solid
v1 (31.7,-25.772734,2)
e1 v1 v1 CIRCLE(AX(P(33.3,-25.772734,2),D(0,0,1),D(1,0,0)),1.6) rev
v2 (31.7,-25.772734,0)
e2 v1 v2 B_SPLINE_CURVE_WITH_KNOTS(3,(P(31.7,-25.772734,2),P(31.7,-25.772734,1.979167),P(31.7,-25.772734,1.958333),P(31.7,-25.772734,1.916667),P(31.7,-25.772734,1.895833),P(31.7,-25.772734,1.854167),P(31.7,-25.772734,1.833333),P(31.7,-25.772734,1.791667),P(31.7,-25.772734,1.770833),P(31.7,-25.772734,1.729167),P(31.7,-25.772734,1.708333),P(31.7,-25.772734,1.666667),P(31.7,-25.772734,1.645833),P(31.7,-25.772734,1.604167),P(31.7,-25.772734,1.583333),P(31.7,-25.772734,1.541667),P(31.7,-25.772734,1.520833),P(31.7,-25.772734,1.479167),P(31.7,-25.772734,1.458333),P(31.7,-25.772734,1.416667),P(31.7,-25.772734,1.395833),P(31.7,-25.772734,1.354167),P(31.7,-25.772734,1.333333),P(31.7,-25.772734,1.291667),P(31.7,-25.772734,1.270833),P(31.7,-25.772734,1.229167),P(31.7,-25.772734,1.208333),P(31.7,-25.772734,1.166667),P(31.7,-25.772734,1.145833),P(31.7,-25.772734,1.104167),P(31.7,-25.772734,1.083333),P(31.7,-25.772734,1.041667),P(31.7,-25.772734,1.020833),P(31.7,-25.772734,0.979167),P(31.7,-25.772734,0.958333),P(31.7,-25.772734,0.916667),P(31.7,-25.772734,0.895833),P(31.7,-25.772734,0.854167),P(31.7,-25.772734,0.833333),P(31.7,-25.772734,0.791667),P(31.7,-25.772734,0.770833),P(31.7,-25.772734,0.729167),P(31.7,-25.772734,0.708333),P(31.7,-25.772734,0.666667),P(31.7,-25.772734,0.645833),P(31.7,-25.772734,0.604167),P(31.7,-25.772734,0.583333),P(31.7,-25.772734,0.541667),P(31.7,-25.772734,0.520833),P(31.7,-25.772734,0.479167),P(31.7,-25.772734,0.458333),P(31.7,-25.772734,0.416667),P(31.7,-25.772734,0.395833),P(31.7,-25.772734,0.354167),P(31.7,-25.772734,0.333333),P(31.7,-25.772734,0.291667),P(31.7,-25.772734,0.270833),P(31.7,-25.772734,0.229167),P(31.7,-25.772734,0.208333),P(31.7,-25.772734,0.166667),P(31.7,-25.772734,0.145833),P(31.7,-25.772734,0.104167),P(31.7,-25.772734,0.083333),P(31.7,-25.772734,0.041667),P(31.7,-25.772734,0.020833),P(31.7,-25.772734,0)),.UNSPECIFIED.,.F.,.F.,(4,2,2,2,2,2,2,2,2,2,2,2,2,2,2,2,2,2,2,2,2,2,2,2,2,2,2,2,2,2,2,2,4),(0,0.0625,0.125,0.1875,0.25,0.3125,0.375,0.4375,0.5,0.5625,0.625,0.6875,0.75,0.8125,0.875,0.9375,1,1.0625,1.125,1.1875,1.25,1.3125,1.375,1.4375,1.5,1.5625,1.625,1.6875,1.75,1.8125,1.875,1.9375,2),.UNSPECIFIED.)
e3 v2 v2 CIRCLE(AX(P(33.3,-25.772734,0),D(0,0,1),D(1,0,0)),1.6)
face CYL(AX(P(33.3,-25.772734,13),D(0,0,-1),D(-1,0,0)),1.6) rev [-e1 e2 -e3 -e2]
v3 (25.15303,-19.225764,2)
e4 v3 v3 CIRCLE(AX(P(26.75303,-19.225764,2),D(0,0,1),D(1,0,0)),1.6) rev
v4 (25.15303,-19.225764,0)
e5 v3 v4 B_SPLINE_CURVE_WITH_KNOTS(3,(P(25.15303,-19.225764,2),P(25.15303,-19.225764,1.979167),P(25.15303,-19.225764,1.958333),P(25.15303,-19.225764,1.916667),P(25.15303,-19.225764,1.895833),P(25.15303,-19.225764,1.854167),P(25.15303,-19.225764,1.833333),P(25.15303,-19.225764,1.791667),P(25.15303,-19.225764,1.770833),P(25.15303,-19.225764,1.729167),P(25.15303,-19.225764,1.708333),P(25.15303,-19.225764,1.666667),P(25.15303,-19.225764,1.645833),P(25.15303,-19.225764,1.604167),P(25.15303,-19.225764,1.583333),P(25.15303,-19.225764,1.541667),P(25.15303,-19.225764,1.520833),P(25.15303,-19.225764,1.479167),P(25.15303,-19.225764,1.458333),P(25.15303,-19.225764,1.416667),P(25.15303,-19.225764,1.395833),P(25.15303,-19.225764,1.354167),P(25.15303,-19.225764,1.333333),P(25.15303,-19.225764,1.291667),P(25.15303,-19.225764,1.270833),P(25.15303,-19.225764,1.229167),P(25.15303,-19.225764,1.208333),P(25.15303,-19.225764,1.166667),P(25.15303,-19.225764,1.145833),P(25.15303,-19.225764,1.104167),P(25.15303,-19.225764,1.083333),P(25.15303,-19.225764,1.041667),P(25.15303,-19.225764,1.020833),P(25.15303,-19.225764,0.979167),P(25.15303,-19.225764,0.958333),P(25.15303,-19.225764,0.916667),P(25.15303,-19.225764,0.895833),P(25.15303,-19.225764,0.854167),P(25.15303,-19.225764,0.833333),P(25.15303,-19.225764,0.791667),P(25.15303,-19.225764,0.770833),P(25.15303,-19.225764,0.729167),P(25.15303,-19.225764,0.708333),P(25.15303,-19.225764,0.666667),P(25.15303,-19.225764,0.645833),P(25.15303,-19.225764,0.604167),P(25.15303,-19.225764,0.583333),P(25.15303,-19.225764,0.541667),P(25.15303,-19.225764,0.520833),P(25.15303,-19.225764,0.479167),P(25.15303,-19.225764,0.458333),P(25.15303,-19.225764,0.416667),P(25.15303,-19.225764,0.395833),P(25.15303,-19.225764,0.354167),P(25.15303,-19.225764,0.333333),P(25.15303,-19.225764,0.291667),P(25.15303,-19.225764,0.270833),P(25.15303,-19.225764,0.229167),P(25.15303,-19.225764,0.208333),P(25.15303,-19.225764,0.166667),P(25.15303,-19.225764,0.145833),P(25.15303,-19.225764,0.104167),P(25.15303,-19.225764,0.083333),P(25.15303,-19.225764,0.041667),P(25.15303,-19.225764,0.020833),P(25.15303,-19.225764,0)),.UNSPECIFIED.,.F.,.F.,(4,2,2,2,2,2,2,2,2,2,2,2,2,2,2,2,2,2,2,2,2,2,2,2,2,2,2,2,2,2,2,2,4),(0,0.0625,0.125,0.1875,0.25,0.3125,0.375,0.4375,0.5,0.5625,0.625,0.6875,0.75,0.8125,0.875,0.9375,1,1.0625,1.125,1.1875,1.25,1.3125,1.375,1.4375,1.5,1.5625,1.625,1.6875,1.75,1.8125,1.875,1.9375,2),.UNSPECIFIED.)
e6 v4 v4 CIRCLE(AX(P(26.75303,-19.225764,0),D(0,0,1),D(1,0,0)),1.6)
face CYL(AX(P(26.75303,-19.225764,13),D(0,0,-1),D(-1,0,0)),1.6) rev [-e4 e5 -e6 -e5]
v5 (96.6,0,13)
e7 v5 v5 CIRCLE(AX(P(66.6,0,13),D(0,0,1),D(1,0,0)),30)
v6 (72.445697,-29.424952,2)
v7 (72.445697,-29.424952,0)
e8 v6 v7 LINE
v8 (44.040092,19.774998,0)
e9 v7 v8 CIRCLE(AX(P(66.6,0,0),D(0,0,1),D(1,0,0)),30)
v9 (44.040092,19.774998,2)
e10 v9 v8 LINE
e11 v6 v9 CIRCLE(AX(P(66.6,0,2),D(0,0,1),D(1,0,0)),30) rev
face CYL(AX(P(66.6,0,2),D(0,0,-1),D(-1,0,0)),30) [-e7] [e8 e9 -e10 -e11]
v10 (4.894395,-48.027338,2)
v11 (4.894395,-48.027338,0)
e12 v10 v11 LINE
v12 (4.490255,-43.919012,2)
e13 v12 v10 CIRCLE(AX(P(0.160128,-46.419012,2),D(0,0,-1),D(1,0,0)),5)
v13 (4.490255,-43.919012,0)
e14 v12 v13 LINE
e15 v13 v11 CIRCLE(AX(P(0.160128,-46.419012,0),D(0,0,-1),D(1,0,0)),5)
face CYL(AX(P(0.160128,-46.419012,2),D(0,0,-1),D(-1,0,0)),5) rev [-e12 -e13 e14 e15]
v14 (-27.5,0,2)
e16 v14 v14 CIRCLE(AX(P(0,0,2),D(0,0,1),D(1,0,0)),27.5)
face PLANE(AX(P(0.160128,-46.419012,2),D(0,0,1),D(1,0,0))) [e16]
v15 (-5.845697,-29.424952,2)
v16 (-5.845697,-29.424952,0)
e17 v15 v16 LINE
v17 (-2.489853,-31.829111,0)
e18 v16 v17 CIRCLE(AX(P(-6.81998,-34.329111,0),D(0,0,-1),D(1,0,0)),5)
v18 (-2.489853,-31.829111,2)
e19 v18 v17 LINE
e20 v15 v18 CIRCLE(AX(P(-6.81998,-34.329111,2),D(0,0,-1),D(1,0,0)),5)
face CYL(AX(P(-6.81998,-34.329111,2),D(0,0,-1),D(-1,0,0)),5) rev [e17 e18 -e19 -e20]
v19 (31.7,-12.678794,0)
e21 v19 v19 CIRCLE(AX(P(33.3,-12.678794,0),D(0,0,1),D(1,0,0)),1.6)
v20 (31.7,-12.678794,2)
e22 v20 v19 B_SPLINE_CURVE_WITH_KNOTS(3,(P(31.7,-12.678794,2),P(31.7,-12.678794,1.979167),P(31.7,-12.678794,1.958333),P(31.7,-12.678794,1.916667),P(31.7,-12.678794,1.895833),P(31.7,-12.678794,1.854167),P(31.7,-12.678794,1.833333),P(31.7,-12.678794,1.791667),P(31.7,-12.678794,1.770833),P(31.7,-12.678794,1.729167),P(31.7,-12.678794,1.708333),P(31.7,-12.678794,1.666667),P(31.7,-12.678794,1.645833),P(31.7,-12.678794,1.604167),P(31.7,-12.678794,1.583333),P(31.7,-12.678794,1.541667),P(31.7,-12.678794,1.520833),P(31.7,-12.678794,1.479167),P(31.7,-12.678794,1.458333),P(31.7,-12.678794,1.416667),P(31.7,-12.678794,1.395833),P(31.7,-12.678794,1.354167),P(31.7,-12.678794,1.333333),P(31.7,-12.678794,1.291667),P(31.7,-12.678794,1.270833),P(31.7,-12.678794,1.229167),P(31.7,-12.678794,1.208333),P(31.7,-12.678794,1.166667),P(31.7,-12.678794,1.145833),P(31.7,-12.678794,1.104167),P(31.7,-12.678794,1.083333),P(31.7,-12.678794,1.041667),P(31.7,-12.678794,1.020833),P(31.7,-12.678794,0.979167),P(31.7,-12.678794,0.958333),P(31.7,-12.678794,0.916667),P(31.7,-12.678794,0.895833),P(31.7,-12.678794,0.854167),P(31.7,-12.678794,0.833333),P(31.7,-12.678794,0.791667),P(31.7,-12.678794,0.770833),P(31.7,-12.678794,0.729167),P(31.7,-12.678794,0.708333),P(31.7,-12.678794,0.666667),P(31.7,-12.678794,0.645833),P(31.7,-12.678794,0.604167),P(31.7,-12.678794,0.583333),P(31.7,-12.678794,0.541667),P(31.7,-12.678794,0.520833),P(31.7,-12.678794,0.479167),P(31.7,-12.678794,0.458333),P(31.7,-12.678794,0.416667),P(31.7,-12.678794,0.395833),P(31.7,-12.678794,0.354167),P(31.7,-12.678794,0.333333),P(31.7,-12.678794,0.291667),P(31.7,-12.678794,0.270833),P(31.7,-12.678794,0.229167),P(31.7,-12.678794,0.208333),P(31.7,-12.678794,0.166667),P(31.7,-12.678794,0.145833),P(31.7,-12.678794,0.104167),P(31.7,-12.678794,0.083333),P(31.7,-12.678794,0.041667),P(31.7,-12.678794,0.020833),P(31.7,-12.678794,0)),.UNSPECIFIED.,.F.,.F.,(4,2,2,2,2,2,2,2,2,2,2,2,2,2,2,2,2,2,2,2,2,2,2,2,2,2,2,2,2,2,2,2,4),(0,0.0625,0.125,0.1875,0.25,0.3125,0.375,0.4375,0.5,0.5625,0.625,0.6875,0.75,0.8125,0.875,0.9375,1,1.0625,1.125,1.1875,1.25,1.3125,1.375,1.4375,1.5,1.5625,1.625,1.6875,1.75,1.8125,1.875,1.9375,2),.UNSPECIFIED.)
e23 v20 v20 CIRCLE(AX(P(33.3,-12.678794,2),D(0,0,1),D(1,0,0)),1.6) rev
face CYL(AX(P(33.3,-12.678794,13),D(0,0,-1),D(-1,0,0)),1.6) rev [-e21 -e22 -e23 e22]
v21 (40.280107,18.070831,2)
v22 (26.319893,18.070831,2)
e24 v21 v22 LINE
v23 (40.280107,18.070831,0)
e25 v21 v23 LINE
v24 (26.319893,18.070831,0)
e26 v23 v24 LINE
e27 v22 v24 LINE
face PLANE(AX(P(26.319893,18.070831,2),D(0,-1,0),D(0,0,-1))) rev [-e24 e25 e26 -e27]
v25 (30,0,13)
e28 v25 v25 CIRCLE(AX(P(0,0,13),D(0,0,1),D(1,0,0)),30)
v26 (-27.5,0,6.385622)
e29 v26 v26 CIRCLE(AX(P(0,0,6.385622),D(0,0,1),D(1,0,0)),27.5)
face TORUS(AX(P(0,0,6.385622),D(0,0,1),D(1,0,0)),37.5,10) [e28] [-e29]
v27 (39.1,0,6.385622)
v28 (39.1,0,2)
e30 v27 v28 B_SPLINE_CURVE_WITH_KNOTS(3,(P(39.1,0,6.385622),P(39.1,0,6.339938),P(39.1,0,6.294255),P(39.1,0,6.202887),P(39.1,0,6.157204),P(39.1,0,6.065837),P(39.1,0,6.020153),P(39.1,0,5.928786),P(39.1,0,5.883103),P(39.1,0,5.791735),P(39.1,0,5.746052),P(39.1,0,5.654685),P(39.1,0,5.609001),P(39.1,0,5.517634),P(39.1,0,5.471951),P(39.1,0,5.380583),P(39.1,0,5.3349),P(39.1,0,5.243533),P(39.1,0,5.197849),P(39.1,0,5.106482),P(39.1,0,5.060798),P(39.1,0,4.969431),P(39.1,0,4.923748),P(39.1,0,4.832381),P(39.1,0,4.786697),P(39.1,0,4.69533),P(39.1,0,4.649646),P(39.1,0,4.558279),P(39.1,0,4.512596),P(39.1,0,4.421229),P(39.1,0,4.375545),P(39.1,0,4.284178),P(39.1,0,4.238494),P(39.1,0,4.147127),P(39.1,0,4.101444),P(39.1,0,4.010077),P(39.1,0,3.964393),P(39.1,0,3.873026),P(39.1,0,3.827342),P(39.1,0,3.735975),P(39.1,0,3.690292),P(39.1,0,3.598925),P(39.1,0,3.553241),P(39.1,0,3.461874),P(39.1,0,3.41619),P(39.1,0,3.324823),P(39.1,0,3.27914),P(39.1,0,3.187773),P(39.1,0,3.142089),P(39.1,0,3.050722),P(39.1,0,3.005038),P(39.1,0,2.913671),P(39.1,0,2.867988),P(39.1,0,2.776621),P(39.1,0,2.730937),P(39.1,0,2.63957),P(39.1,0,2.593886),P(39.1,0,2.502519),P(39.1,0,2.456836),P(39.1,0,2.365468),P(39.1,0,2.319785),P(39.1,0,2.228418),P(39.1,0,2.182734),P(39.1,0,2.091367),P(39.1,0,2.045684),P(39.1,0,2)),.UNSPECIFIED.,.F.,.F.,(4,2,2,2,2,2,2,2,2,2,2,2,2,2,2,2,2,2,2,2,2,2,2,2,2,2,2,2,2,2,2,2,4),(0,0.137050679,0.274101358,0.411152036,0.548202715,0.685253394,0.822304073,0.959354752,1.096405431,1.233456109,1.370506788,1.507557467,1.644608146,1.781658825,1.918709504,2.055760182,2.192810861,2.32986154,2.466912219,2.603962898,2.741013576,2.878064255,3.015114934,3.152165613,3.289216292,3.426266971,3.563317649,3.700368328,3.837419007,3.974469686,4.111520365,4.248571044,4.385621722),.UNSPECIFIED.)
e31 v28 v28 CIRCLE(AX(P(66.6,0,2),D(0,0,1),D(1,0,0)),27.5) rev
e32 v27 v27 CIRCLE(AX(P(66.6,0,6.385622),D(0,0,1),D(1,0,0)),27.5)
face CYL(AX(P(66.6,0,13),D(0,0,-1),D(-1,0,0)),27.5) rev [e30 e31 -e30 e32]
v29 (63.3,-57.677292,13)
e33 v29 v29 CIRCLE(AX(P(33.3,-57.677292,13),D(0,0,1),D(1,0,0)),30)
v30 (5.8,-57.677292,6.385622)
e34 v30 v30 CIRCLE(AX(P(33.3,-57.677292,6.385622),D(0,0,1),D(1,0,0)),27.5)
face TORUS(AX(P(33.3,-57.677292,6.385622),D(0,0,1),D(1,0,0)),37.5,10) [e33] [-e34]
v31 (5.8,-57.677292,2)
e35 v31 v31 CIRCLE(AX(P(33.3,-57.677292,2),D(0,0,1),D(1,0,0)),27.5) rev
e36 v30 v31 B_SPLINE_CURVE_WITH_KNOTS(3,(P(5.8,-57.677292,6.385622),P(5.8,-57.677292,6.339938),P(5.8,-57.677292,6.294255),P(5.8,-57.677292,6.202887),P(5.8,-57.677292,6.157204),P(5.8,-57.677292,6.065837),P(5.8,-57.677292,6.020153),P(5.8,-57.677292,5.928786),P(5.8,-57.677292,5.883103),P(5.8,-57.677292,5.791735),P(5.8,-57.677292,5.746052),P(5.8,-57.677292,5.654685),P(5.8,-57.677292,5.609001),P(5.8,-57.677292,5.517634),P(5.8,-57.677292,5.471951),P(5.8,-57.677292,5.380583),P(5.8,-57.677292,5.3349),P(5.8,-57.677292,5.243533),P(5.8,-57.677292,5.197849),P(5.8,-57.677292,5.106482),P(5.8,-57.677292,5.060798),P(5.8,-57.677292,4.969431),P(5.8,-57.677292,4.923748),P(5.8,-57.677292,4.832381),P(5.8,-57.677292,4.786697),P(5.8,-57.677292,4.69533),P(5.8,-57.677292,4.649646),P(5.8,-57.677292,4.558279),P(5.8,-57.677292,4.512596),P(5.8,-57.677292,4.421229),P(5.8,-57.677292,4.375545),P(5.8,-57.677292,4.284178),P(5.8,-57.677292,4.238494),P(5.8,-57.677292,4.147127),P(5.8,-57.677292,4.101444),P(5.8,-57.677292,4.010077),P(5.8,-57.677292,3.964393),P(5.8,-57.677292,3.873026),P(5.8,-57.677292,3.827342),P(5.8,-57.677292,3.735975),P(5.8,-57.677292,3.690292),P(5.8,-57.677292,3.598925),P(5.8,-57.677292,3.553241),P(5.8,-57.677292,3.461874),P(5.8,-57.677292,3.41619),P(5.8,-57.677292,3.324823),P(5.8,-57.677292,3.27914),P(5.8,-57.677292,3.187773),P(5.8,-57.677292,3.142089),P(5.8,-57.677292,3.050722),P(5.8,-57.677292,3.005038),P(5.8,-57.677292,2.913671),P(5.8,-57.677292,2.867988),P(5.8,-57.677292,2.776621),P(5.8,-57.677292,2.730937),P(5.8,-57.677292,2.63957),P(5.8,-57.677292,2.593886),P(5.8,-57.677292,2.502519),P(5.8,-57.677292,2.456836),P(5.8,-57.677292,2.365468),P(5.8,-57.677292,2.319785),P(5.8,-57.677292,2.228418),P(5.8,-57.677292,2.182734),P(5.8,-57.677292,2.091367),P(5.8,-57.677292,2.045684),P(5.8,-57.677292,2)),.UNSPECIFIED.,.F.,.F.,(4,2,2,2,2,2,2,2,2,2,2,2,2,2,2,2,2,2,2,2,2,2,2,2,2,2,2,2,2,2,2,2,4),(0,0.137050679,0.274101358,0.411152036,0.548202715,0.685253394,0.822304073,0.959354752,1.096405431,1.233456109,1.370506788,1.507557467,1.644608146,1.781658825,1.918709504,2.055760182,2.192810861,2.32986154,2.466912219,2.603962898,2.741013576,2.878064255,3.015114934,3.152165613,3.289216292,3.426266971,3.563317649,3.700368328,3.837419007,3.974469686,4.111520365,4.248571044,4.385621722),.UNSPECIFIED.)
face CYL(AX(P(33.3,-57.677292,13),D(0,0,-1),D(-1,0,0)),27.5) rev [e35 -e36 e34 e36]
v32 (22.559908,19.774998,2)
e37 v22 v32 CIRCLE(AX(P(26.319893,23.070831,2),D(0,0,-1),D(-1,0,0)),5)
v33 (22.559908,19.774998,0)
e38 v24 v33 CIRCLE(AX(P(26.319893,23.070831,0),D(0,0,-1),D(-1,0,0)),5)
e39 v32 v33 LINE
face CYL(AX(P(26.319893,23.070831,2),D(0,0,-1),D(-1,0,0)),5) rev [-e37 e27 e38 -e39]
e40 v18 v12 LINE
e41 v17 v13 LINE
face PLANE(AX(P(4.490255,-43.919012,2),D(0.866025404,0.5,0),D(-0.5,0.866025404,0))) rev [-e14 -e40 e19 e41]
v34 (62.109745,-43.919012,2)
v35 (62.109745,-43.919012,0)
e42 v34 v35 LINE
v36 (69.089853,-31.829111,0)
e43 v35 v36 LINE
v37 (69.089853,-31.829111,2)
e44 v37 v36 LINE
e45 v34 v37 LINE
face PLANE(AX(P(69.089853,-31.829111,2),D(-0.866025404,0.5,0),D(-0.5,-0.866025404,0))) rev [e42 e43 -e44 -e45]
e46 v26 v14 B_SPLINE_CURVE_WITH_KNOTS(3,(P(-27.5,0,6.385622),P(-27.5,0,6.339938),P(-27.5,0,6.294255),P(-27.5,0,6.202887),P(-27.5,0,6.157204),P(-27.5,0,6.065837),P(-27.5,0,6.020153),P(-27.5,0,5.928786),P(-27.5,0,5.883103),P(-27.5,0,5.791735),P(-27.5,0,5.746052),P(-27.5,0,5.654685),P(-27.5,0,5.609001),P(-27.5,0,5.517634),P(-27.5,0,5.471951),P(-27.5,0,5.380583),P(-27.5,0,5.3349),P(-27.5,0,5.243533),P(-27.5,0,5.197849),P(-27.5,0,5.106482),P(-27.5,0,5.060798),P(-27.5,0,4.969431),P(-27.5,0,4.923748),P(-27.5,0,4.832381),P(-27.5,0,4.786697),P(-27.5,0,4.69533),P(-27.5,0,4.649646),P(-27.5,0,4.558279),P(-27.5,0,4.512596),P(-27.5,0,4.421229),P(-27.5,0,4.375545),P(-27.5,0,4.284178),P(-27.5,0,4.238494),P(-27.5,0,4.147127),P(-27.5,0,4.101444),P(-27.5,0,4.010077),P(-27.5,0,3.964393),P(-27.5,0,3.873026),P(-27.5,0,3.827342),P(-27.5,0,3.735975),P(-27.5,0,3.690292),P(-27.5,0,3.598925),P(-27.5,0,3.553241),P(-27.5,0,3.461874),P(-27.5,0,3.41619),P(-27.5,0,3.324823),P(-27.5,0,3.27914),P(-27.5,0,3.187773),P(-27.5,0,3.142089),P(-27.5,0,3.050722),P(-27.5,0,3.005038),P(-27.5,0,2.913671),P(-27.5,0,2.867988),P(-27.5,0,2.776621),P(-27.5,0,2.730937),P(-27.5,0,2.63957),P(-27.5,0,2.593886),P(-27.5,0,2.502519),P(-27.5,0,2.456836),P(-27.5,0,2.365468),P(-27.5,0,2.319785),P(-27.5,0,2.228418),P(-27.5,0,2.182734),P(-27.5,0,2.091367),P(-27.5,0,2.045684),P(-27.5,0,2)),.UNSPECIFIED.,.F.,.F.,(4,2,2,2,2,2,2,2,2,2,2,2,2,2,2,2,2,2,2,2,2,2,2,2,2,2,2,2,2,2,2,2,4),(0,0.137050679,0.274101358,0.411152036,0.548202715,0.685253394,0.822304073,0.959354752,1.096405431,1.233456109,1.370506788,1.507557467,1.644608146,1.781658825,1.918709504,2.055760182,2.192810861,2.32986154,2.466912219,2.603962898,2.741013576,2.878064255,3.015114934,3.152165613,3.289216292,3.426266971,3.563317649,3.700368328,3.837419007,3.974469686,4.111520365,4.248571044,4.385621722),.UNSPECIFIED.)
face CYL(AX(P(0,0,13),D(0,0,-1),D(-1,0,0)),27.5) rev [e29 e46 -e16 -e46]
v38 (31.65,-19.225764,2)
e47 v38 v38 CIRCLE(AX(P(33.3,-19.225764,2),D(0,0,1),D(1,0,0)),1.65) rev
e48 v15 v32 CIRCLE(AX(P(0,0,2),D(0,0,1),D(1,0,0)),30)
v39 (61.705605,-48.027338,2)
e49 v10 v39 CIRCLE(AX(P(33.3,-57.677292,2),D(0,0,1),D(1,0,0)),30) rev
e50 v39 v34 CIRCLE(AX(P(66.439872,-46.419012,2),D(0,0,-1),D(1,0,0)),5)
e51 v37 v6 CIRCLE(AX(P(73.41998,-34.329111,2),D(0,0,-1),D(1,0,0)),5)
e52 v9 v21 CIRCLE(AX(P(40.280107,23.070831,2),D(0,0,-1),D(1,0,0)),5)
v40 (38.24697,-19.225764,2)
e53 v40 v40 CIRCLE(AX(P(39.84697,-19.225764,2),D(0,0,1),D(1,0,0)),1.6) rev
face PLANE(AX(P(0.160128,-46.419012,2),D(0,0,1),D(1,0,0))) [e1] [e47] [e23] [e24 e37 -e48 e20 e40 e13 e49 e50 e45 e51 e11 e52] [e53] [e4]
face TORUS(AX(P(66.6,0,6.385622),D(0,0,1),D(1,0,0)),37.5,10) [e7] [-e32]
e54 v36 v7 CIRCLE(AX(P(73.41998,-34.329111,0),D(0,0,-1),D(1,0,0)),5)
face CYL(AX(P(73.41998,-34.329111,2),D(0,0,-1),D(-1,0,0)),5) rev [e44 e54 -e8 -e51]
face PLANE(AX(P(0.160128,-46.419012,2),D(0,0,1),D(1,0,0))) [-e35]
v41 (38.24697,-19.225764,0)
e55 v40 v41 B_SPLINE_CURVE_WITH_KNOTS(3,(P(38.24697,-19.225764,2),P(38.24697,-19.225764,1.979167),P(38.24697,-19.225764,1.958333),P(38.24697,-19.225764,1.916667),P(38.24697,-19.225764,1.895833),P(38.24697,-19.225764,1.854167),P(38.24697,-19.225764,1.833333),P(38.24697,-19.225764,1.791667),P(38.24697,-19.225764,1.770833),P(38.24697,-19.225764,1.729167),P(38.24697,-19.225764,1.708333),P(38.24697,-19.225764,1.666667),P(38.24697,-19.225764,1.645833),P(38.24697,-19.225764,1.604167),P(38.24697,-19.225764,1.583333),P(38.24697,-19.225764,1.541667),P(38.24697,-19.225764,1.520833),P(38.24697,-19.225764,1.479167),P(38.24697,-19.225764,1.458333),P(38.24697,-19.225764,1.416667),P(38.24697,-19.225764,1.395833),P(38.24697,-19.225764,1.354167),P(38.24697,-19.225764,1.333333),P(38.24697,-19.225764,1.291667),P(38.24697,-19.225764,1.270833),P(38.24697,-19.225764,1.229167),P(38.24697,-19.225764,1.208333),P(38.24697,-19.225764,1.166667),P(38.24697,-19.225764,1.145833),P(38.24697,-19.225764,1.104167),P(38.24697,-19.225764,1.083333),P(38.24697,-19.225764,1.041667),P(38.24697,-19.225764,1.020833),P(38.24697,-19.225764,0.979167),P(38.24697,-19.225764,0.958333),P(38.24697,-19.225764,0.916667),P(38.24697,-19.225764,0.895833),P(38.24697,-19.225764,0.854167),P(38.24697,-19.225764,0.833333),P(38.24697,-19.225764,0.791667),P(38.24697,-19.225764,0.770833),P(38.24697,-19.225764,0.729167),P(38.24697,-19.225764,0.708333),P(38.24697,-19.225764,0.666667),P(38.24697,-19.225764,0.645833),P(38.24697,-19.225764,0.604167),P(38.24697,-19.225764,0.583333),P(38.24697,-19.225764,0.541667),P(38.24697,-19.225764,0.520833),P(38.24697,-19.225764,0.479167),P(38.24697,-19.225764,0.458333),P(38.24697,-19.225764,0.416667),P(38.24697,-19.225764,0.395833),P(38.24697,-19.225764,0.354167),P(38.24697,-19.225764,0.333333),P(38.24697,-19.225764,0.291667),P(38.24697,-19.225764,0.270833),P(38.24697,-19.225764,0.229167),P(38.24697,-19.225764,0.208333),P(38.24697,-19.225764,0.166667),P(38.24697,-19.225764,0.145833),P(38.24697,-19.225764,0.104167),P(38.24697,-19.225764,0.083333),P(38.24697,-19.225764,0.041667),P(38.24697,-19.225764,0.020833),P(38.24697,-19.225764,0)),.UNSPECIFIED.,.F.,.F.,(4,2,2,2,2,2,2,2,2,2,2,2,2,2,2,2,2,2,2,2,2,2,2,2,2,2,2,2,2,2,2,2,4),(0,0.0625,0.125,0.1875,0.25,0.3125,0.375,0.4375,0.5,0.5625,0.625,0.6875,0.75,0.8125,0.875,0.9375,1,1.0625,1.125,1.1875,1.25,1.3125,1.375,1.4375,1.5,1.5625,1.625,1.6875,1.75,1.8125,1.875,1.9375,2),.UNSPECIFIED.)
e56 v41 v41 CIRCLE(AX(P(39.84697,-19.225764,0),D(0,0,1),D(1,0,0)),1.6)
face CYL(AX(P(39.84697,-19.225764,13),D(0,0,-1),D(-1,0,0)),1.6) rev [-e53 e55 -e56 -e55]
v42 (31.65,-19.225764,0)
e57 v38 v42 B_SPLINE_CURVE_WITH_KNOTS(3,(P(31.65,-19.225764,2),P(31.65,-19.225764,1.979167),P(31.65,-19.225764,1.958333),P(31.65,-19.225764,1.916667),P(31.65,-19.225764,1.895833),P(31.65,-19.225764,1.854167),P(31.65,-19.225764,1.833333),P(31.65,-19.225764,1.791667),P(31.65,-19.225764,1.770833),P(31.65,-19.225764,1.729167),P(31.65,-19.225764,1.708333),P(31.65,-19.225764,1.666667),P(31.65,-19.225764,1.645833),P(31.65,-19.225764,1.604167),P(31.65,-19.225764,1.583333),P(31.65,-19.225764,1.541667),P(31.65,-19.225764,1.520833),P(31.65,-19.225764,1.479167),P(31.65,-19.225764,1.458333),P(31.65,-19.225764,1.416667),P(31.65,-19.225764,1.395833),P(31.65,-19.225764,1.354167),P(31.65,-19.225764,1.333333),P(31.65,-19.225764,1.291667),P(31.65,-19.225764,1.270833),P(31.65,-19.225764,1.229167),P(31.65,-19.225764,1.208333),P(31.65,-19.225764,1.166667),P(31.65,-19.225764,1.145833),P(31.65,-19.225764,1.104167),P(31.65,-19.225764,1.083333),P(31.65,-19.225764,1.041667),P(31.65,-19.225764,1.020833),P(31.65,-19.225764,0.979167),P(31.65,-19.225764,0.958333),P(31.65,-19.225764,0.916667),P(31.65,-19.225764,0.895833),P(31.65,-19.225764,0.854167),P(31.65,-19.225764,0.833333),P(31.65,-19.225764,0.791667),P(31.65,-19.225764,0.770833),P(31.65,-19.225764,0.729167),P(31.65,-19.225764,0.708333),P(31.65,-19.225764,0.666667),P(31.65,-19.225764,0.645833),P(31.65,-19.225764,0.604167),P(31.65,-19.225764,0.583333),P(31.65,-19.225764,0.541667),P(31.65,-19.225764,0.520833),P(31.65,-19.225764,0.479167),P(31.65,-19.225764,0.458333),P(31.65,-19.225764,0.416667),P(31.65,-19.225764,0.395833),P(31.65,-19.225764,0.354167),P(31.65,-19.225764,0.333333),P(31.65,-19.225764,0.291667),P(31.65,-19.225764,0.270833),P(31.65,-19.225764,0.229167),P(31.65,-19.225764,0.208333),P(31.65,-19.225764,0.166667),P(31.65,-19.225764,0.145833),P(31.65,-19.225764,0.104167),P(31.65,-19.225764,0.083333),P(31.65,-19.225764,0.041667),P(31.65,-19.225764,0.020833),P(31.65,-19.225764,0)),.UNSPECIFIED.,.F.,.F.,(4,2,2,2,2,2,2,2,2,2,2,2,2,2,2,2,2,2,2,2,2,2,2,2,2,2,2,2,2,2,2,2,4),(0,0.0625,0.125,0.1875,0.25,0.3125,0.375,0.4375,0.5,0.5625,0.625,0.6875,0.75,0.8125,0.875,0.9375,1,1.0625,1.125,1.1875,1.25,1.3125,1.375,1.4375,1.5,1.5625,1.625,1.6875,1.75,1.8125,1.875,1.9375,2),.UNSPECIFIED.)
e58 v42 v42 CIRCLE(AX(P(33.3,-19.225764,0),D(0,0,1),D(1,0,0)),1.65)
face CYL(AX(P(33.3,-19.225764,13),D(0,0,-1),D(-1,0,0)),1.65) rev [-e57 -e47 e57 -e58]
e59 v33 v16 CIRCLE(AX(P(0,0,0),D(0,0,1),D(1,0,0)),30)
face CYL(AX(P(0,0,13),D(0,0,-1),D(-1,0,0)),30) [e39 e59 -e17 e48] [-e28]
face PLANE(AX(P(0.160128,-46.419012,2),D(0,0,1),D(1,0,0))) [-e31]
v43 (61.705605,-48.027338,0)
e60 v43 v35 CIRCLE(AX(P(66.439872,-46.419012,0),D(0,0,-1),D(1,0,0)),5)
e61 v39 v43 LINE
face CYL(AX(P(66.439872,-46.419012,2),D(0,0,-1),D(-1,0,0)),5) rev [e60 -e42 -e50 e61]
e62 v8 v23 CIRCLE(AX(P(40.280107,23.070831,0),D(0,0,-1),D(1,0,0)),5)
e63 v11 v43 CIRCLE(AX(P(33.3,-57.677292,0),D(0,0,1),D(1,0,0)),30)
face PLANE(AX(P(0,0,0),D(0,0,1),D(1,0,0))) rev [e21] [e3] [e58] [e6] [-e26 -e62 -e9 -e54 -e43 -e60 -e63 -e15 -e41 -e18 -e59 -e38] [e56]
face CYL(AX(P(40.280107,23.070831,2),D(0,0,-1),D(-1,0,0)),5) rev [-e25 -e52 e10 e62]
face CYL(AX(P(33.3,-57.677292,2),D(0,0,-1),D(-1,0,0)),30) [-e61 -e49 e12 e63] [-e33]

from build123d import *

# Parameters (mm, degrees)
SKETCH_1_R          = 30
SKETCH_1_R_2        = 27.5
EXTRUDE_1_DEPTH     = 13
SKETCH_1_R_3        = 29.999999999999996
EXTRUDE_1_2_DEPTH   = 13
EXTRUDE_1_3_DEPTH   = 13
EXTRUDE_2_DEPTH     = 2
SKETCH_3_R          = 1.6500000000000017
SKETCH_3_R_2        = 1.5999999999999979
SKETCH_3_R_3        = 1.5999999999999985
SKETCH_3_R_4        = 1.6000000000000019
CUT_EXTRUDE_5_DEPTH = 132.10250765535577
FILLET_1_R          = 10


with BuildPart() as part:
    # 草图1 → 凸台-拉伸1 (new body)
    with BuildSketch(Plane.XY):
        with Locations(Location((0, 0, 0), (0, 0, 180))):
            Circle(SKETCH_1_R)
        with Locations(Location((0, 0, 0), (0, 0, 180))):
            Circle(SKETCH_1_R_2, mode=Mode.SUBTRACT)
    extrude(amount=EXTRUDE_1_DEPTH)



with BuildPart() as body_2:
    # 草图1 → Extrude 1 2 (new body)
    with BuildSketch(Plane.XY):
        with Locations(Location((66.6, 0, 0), (0, 0, 180))):
            Circle(SKETCH_1_R_3)
        with Locations(Location((66.6, 0, 0), (0, 0, 180))):
            Circle(SKETCH_1_R_2, mode=Mode.SUBTRACT)
    extrude(amount=EXTRUDE_1_2_DEPTH)


with BuildPart() as body_3:
    # 草图1 → Extrude 1 3 (new body)
    with BuildSketch(Plane.XY):
        with Locations(Location((33.30000000000001, -57.6772918920436, 0), (0, 0, 180))):
            Circle(SKETCH_1_R_3)
        with Locations(Location((33.30000000000001, -57.6772918920436, 0), (0, 0, 180))):
            Circle(SKETCH_1_R_2, mode=Mode.SUBTRACT)
    extrude(amount=EXTRUDE_1_3_DEPTH)


with BuildPart() as part_1:
    add(part.part)

    add(body_2.part)  # 凸台-拉伸2 merges body 2

    add(body_3.part)  # 凸台-拉伸2 merges body 3
    # 草图2 → 凸台-拉伸2 (add)
    with BuildSketch(Plane.XY):
        with BuildLine():
            Line((26.3198925252566, 18.070831312697457), (40.280107474743396, 18.070831312697457))
            ThreePointArc((40.280107474743396, 18.070831312697457), (42.3441853289733, 18.516758123597654), (44.04009212120862, 19.77499826802639))
            ThreePointArc((44.04009212120862, 19.77499826802639), (92.58076211353317, 15), (72.44569692050842, -29.424952464083248))
            ThreePointArc((72.44569692050842, -29.424952464083248), (70.50807559525407, -30.264530756395246), (69.08985272167097, -31.829111208097117))
            Line((69.08985272167097, -31.829111208097117), (62.10974524692759, -43.91901199664395))
            ThreePointArc((62.10974524692759, -43.91901199664395), (61.46389026628078, -45.92951925924603), (61.70560479929982, -48.027337695986766))
            ThreePointArc((61.70560479929982, -48.027337695986766), (33.300000000000004, -87.6772918920436), (4.894395200700185, -48.02733769598677))
            ThreePointArc((4.894395200700185, -48.02733769598677), (5.13610973371921, -45.92951925924604), (4.4902547530724135, -43.91901199664397))
            Line((4.4902547530724135, -43.91901199664397), (-2.489852721670984, -31.829111208097103))
            ThreePointArc((-2.489852721670984, -31.829111208097103), (-3.9080755952540875, -30.264530756395228), (-5.845696920508439, -29.42495246408323))
            ThreePointArc((-5.845696920508439, -29.42495246408323), (-25.980762113533153, 15.000000000000009), (22.55990787879137, 19.77499826802639))
            ThreePointArc((22.55990787879137, 19.77499826802639), (24.25581467102669, 18.516758123597654), (26.3198925252566, 18.070831312697457))
        make_face()
    extrude(amount=EXTRUDE_2_DEPTH)

    # 草图3 → 切除-拉伸5 (cut, through all)
    with BuildSketch(Plane.XY):
        with Locations(Location((33.3, -19.225763964014533, 0), (0, 0, 180))):
            Circle(SKETCH_3_R)
        with Locations(Location((33.3, -12.678793774014526, 0), (0, 0, 180))):
            Circle(SKETCH_3_R_2)
        with Locations(Location((39.84697019, -19.225763964014533, 0), (0, 0, 180))):
            Circle(SKETCH_3_R_3)
        with Locations(Location((33.3, -25.772734154014536, 0), (0, 0, 180))):
            Circle(SKETCH_3_R_3)
        with Locations(Location((26.75302980999999, -19.225763964014533, 0), (0, 0, 180))):
            Circle(SKETCH_3_R_4)
    extrude(amount=CUT_EXTRUDE_5_DEPTH, mode=Mode.SUBTRACT)

    # 圆角1
    # the kernel refuses this fillet: 10 mm, written as the material it takes off along each edge
    with BuildSketch(Plane(origin=(0, 0, 13), x_dir=(-1, 1.2e-16, 0), z_dir=(1.2e-16, 1, 0))) as fillet_1_piece_1:
        with BuildLine():
            CenterArc((37.5, -6.614378277661482), FILLET_1_R, 138.59037789072914, 41.409622109270856)
            Line((27.5, -6.614378277661482), (27.3, -6.614378277661482))
            Line((27.3, -6.614378277661482), (27.3, 0))
            Line((27.3, 0), (27.5, 0.1999999999999993))
            ThreePointArc((27.5, 0.1999999999999993), (28.75, 0.1999999999999993), (29.85, 0.1322875655532254))
            Line((29.85, 0.1322875655532254), (30, -3.55e-15))
        make_face()
    revolve(axis=Axis((0, 0, 13), (0, 0, 1)), mode=Mode.SUBTRACT)
    with BuildSketch(Plane(origin=(66.6, 0, 13), x_dir=(-1, 1.2e-16, 0), z_dir=(1.2e-16, 1, 0))) as fillet_1_piece_2:
        with BuildLine():
            CenterArc((37.5, -6.614378277661482), FILLET_1_R, 138.59037789072914, 41.409622109270856)
            Line((27.5, -6.614378277661482), (27.299999999999997, -6.614378277661482))
            Line((27.299999999999997, -6.614378277661482), (27.299999999999997, 0))
            Line((27.299999999999997, 0), (27.5, 0.1999999999999993))
            ThreePointArc((27.5, 0.1999999999999993), (28.75, 0.1999999999999993), (29.85, 0.1322875655532254))
            Line((29.85, 0.1322875655532254), (30, -3.55e-15))
        make_face()
    revolve(axis=Axis((66.6, 0, 13), (0, 0, 1)), mode=Mode.SUBTRACT)
    with BuildSketch(Plane(origin=(33.30000000000001, -57.6772918920436, 13), x_dir=(-1, 0, 0), z_dir=(0, 1, 0))) as fillet_1_piece_3:
        with BuildLine():
            CenterArc((37.5, -6.614378277661478), FILLET_1_R, 138.59037789072914, 41.409622109270856)
            Line((27.5, -6.614378277661478), (27.3, -6.614378277661478))
            Line((27.3, -6.614378277661478), (27.3, 0))
            Line((27.3, 0), (27.5, 0.1999999999999993))
            ThreePointArc((27.5, 0.1999999999999993), (28.75, 0.1999999999999993), (29.849999999999998, 0.1322875655532254))
            Line((29.849999999999998, 0.1322875655532254), (30, -3.55e-15))
        make_face()
    revolve(axis=Axis((33.30000000000001, -57.6772918920436, 13), (0, 0, 1)), mode=Mode.SUBTRACT)


solid = part_1.part
